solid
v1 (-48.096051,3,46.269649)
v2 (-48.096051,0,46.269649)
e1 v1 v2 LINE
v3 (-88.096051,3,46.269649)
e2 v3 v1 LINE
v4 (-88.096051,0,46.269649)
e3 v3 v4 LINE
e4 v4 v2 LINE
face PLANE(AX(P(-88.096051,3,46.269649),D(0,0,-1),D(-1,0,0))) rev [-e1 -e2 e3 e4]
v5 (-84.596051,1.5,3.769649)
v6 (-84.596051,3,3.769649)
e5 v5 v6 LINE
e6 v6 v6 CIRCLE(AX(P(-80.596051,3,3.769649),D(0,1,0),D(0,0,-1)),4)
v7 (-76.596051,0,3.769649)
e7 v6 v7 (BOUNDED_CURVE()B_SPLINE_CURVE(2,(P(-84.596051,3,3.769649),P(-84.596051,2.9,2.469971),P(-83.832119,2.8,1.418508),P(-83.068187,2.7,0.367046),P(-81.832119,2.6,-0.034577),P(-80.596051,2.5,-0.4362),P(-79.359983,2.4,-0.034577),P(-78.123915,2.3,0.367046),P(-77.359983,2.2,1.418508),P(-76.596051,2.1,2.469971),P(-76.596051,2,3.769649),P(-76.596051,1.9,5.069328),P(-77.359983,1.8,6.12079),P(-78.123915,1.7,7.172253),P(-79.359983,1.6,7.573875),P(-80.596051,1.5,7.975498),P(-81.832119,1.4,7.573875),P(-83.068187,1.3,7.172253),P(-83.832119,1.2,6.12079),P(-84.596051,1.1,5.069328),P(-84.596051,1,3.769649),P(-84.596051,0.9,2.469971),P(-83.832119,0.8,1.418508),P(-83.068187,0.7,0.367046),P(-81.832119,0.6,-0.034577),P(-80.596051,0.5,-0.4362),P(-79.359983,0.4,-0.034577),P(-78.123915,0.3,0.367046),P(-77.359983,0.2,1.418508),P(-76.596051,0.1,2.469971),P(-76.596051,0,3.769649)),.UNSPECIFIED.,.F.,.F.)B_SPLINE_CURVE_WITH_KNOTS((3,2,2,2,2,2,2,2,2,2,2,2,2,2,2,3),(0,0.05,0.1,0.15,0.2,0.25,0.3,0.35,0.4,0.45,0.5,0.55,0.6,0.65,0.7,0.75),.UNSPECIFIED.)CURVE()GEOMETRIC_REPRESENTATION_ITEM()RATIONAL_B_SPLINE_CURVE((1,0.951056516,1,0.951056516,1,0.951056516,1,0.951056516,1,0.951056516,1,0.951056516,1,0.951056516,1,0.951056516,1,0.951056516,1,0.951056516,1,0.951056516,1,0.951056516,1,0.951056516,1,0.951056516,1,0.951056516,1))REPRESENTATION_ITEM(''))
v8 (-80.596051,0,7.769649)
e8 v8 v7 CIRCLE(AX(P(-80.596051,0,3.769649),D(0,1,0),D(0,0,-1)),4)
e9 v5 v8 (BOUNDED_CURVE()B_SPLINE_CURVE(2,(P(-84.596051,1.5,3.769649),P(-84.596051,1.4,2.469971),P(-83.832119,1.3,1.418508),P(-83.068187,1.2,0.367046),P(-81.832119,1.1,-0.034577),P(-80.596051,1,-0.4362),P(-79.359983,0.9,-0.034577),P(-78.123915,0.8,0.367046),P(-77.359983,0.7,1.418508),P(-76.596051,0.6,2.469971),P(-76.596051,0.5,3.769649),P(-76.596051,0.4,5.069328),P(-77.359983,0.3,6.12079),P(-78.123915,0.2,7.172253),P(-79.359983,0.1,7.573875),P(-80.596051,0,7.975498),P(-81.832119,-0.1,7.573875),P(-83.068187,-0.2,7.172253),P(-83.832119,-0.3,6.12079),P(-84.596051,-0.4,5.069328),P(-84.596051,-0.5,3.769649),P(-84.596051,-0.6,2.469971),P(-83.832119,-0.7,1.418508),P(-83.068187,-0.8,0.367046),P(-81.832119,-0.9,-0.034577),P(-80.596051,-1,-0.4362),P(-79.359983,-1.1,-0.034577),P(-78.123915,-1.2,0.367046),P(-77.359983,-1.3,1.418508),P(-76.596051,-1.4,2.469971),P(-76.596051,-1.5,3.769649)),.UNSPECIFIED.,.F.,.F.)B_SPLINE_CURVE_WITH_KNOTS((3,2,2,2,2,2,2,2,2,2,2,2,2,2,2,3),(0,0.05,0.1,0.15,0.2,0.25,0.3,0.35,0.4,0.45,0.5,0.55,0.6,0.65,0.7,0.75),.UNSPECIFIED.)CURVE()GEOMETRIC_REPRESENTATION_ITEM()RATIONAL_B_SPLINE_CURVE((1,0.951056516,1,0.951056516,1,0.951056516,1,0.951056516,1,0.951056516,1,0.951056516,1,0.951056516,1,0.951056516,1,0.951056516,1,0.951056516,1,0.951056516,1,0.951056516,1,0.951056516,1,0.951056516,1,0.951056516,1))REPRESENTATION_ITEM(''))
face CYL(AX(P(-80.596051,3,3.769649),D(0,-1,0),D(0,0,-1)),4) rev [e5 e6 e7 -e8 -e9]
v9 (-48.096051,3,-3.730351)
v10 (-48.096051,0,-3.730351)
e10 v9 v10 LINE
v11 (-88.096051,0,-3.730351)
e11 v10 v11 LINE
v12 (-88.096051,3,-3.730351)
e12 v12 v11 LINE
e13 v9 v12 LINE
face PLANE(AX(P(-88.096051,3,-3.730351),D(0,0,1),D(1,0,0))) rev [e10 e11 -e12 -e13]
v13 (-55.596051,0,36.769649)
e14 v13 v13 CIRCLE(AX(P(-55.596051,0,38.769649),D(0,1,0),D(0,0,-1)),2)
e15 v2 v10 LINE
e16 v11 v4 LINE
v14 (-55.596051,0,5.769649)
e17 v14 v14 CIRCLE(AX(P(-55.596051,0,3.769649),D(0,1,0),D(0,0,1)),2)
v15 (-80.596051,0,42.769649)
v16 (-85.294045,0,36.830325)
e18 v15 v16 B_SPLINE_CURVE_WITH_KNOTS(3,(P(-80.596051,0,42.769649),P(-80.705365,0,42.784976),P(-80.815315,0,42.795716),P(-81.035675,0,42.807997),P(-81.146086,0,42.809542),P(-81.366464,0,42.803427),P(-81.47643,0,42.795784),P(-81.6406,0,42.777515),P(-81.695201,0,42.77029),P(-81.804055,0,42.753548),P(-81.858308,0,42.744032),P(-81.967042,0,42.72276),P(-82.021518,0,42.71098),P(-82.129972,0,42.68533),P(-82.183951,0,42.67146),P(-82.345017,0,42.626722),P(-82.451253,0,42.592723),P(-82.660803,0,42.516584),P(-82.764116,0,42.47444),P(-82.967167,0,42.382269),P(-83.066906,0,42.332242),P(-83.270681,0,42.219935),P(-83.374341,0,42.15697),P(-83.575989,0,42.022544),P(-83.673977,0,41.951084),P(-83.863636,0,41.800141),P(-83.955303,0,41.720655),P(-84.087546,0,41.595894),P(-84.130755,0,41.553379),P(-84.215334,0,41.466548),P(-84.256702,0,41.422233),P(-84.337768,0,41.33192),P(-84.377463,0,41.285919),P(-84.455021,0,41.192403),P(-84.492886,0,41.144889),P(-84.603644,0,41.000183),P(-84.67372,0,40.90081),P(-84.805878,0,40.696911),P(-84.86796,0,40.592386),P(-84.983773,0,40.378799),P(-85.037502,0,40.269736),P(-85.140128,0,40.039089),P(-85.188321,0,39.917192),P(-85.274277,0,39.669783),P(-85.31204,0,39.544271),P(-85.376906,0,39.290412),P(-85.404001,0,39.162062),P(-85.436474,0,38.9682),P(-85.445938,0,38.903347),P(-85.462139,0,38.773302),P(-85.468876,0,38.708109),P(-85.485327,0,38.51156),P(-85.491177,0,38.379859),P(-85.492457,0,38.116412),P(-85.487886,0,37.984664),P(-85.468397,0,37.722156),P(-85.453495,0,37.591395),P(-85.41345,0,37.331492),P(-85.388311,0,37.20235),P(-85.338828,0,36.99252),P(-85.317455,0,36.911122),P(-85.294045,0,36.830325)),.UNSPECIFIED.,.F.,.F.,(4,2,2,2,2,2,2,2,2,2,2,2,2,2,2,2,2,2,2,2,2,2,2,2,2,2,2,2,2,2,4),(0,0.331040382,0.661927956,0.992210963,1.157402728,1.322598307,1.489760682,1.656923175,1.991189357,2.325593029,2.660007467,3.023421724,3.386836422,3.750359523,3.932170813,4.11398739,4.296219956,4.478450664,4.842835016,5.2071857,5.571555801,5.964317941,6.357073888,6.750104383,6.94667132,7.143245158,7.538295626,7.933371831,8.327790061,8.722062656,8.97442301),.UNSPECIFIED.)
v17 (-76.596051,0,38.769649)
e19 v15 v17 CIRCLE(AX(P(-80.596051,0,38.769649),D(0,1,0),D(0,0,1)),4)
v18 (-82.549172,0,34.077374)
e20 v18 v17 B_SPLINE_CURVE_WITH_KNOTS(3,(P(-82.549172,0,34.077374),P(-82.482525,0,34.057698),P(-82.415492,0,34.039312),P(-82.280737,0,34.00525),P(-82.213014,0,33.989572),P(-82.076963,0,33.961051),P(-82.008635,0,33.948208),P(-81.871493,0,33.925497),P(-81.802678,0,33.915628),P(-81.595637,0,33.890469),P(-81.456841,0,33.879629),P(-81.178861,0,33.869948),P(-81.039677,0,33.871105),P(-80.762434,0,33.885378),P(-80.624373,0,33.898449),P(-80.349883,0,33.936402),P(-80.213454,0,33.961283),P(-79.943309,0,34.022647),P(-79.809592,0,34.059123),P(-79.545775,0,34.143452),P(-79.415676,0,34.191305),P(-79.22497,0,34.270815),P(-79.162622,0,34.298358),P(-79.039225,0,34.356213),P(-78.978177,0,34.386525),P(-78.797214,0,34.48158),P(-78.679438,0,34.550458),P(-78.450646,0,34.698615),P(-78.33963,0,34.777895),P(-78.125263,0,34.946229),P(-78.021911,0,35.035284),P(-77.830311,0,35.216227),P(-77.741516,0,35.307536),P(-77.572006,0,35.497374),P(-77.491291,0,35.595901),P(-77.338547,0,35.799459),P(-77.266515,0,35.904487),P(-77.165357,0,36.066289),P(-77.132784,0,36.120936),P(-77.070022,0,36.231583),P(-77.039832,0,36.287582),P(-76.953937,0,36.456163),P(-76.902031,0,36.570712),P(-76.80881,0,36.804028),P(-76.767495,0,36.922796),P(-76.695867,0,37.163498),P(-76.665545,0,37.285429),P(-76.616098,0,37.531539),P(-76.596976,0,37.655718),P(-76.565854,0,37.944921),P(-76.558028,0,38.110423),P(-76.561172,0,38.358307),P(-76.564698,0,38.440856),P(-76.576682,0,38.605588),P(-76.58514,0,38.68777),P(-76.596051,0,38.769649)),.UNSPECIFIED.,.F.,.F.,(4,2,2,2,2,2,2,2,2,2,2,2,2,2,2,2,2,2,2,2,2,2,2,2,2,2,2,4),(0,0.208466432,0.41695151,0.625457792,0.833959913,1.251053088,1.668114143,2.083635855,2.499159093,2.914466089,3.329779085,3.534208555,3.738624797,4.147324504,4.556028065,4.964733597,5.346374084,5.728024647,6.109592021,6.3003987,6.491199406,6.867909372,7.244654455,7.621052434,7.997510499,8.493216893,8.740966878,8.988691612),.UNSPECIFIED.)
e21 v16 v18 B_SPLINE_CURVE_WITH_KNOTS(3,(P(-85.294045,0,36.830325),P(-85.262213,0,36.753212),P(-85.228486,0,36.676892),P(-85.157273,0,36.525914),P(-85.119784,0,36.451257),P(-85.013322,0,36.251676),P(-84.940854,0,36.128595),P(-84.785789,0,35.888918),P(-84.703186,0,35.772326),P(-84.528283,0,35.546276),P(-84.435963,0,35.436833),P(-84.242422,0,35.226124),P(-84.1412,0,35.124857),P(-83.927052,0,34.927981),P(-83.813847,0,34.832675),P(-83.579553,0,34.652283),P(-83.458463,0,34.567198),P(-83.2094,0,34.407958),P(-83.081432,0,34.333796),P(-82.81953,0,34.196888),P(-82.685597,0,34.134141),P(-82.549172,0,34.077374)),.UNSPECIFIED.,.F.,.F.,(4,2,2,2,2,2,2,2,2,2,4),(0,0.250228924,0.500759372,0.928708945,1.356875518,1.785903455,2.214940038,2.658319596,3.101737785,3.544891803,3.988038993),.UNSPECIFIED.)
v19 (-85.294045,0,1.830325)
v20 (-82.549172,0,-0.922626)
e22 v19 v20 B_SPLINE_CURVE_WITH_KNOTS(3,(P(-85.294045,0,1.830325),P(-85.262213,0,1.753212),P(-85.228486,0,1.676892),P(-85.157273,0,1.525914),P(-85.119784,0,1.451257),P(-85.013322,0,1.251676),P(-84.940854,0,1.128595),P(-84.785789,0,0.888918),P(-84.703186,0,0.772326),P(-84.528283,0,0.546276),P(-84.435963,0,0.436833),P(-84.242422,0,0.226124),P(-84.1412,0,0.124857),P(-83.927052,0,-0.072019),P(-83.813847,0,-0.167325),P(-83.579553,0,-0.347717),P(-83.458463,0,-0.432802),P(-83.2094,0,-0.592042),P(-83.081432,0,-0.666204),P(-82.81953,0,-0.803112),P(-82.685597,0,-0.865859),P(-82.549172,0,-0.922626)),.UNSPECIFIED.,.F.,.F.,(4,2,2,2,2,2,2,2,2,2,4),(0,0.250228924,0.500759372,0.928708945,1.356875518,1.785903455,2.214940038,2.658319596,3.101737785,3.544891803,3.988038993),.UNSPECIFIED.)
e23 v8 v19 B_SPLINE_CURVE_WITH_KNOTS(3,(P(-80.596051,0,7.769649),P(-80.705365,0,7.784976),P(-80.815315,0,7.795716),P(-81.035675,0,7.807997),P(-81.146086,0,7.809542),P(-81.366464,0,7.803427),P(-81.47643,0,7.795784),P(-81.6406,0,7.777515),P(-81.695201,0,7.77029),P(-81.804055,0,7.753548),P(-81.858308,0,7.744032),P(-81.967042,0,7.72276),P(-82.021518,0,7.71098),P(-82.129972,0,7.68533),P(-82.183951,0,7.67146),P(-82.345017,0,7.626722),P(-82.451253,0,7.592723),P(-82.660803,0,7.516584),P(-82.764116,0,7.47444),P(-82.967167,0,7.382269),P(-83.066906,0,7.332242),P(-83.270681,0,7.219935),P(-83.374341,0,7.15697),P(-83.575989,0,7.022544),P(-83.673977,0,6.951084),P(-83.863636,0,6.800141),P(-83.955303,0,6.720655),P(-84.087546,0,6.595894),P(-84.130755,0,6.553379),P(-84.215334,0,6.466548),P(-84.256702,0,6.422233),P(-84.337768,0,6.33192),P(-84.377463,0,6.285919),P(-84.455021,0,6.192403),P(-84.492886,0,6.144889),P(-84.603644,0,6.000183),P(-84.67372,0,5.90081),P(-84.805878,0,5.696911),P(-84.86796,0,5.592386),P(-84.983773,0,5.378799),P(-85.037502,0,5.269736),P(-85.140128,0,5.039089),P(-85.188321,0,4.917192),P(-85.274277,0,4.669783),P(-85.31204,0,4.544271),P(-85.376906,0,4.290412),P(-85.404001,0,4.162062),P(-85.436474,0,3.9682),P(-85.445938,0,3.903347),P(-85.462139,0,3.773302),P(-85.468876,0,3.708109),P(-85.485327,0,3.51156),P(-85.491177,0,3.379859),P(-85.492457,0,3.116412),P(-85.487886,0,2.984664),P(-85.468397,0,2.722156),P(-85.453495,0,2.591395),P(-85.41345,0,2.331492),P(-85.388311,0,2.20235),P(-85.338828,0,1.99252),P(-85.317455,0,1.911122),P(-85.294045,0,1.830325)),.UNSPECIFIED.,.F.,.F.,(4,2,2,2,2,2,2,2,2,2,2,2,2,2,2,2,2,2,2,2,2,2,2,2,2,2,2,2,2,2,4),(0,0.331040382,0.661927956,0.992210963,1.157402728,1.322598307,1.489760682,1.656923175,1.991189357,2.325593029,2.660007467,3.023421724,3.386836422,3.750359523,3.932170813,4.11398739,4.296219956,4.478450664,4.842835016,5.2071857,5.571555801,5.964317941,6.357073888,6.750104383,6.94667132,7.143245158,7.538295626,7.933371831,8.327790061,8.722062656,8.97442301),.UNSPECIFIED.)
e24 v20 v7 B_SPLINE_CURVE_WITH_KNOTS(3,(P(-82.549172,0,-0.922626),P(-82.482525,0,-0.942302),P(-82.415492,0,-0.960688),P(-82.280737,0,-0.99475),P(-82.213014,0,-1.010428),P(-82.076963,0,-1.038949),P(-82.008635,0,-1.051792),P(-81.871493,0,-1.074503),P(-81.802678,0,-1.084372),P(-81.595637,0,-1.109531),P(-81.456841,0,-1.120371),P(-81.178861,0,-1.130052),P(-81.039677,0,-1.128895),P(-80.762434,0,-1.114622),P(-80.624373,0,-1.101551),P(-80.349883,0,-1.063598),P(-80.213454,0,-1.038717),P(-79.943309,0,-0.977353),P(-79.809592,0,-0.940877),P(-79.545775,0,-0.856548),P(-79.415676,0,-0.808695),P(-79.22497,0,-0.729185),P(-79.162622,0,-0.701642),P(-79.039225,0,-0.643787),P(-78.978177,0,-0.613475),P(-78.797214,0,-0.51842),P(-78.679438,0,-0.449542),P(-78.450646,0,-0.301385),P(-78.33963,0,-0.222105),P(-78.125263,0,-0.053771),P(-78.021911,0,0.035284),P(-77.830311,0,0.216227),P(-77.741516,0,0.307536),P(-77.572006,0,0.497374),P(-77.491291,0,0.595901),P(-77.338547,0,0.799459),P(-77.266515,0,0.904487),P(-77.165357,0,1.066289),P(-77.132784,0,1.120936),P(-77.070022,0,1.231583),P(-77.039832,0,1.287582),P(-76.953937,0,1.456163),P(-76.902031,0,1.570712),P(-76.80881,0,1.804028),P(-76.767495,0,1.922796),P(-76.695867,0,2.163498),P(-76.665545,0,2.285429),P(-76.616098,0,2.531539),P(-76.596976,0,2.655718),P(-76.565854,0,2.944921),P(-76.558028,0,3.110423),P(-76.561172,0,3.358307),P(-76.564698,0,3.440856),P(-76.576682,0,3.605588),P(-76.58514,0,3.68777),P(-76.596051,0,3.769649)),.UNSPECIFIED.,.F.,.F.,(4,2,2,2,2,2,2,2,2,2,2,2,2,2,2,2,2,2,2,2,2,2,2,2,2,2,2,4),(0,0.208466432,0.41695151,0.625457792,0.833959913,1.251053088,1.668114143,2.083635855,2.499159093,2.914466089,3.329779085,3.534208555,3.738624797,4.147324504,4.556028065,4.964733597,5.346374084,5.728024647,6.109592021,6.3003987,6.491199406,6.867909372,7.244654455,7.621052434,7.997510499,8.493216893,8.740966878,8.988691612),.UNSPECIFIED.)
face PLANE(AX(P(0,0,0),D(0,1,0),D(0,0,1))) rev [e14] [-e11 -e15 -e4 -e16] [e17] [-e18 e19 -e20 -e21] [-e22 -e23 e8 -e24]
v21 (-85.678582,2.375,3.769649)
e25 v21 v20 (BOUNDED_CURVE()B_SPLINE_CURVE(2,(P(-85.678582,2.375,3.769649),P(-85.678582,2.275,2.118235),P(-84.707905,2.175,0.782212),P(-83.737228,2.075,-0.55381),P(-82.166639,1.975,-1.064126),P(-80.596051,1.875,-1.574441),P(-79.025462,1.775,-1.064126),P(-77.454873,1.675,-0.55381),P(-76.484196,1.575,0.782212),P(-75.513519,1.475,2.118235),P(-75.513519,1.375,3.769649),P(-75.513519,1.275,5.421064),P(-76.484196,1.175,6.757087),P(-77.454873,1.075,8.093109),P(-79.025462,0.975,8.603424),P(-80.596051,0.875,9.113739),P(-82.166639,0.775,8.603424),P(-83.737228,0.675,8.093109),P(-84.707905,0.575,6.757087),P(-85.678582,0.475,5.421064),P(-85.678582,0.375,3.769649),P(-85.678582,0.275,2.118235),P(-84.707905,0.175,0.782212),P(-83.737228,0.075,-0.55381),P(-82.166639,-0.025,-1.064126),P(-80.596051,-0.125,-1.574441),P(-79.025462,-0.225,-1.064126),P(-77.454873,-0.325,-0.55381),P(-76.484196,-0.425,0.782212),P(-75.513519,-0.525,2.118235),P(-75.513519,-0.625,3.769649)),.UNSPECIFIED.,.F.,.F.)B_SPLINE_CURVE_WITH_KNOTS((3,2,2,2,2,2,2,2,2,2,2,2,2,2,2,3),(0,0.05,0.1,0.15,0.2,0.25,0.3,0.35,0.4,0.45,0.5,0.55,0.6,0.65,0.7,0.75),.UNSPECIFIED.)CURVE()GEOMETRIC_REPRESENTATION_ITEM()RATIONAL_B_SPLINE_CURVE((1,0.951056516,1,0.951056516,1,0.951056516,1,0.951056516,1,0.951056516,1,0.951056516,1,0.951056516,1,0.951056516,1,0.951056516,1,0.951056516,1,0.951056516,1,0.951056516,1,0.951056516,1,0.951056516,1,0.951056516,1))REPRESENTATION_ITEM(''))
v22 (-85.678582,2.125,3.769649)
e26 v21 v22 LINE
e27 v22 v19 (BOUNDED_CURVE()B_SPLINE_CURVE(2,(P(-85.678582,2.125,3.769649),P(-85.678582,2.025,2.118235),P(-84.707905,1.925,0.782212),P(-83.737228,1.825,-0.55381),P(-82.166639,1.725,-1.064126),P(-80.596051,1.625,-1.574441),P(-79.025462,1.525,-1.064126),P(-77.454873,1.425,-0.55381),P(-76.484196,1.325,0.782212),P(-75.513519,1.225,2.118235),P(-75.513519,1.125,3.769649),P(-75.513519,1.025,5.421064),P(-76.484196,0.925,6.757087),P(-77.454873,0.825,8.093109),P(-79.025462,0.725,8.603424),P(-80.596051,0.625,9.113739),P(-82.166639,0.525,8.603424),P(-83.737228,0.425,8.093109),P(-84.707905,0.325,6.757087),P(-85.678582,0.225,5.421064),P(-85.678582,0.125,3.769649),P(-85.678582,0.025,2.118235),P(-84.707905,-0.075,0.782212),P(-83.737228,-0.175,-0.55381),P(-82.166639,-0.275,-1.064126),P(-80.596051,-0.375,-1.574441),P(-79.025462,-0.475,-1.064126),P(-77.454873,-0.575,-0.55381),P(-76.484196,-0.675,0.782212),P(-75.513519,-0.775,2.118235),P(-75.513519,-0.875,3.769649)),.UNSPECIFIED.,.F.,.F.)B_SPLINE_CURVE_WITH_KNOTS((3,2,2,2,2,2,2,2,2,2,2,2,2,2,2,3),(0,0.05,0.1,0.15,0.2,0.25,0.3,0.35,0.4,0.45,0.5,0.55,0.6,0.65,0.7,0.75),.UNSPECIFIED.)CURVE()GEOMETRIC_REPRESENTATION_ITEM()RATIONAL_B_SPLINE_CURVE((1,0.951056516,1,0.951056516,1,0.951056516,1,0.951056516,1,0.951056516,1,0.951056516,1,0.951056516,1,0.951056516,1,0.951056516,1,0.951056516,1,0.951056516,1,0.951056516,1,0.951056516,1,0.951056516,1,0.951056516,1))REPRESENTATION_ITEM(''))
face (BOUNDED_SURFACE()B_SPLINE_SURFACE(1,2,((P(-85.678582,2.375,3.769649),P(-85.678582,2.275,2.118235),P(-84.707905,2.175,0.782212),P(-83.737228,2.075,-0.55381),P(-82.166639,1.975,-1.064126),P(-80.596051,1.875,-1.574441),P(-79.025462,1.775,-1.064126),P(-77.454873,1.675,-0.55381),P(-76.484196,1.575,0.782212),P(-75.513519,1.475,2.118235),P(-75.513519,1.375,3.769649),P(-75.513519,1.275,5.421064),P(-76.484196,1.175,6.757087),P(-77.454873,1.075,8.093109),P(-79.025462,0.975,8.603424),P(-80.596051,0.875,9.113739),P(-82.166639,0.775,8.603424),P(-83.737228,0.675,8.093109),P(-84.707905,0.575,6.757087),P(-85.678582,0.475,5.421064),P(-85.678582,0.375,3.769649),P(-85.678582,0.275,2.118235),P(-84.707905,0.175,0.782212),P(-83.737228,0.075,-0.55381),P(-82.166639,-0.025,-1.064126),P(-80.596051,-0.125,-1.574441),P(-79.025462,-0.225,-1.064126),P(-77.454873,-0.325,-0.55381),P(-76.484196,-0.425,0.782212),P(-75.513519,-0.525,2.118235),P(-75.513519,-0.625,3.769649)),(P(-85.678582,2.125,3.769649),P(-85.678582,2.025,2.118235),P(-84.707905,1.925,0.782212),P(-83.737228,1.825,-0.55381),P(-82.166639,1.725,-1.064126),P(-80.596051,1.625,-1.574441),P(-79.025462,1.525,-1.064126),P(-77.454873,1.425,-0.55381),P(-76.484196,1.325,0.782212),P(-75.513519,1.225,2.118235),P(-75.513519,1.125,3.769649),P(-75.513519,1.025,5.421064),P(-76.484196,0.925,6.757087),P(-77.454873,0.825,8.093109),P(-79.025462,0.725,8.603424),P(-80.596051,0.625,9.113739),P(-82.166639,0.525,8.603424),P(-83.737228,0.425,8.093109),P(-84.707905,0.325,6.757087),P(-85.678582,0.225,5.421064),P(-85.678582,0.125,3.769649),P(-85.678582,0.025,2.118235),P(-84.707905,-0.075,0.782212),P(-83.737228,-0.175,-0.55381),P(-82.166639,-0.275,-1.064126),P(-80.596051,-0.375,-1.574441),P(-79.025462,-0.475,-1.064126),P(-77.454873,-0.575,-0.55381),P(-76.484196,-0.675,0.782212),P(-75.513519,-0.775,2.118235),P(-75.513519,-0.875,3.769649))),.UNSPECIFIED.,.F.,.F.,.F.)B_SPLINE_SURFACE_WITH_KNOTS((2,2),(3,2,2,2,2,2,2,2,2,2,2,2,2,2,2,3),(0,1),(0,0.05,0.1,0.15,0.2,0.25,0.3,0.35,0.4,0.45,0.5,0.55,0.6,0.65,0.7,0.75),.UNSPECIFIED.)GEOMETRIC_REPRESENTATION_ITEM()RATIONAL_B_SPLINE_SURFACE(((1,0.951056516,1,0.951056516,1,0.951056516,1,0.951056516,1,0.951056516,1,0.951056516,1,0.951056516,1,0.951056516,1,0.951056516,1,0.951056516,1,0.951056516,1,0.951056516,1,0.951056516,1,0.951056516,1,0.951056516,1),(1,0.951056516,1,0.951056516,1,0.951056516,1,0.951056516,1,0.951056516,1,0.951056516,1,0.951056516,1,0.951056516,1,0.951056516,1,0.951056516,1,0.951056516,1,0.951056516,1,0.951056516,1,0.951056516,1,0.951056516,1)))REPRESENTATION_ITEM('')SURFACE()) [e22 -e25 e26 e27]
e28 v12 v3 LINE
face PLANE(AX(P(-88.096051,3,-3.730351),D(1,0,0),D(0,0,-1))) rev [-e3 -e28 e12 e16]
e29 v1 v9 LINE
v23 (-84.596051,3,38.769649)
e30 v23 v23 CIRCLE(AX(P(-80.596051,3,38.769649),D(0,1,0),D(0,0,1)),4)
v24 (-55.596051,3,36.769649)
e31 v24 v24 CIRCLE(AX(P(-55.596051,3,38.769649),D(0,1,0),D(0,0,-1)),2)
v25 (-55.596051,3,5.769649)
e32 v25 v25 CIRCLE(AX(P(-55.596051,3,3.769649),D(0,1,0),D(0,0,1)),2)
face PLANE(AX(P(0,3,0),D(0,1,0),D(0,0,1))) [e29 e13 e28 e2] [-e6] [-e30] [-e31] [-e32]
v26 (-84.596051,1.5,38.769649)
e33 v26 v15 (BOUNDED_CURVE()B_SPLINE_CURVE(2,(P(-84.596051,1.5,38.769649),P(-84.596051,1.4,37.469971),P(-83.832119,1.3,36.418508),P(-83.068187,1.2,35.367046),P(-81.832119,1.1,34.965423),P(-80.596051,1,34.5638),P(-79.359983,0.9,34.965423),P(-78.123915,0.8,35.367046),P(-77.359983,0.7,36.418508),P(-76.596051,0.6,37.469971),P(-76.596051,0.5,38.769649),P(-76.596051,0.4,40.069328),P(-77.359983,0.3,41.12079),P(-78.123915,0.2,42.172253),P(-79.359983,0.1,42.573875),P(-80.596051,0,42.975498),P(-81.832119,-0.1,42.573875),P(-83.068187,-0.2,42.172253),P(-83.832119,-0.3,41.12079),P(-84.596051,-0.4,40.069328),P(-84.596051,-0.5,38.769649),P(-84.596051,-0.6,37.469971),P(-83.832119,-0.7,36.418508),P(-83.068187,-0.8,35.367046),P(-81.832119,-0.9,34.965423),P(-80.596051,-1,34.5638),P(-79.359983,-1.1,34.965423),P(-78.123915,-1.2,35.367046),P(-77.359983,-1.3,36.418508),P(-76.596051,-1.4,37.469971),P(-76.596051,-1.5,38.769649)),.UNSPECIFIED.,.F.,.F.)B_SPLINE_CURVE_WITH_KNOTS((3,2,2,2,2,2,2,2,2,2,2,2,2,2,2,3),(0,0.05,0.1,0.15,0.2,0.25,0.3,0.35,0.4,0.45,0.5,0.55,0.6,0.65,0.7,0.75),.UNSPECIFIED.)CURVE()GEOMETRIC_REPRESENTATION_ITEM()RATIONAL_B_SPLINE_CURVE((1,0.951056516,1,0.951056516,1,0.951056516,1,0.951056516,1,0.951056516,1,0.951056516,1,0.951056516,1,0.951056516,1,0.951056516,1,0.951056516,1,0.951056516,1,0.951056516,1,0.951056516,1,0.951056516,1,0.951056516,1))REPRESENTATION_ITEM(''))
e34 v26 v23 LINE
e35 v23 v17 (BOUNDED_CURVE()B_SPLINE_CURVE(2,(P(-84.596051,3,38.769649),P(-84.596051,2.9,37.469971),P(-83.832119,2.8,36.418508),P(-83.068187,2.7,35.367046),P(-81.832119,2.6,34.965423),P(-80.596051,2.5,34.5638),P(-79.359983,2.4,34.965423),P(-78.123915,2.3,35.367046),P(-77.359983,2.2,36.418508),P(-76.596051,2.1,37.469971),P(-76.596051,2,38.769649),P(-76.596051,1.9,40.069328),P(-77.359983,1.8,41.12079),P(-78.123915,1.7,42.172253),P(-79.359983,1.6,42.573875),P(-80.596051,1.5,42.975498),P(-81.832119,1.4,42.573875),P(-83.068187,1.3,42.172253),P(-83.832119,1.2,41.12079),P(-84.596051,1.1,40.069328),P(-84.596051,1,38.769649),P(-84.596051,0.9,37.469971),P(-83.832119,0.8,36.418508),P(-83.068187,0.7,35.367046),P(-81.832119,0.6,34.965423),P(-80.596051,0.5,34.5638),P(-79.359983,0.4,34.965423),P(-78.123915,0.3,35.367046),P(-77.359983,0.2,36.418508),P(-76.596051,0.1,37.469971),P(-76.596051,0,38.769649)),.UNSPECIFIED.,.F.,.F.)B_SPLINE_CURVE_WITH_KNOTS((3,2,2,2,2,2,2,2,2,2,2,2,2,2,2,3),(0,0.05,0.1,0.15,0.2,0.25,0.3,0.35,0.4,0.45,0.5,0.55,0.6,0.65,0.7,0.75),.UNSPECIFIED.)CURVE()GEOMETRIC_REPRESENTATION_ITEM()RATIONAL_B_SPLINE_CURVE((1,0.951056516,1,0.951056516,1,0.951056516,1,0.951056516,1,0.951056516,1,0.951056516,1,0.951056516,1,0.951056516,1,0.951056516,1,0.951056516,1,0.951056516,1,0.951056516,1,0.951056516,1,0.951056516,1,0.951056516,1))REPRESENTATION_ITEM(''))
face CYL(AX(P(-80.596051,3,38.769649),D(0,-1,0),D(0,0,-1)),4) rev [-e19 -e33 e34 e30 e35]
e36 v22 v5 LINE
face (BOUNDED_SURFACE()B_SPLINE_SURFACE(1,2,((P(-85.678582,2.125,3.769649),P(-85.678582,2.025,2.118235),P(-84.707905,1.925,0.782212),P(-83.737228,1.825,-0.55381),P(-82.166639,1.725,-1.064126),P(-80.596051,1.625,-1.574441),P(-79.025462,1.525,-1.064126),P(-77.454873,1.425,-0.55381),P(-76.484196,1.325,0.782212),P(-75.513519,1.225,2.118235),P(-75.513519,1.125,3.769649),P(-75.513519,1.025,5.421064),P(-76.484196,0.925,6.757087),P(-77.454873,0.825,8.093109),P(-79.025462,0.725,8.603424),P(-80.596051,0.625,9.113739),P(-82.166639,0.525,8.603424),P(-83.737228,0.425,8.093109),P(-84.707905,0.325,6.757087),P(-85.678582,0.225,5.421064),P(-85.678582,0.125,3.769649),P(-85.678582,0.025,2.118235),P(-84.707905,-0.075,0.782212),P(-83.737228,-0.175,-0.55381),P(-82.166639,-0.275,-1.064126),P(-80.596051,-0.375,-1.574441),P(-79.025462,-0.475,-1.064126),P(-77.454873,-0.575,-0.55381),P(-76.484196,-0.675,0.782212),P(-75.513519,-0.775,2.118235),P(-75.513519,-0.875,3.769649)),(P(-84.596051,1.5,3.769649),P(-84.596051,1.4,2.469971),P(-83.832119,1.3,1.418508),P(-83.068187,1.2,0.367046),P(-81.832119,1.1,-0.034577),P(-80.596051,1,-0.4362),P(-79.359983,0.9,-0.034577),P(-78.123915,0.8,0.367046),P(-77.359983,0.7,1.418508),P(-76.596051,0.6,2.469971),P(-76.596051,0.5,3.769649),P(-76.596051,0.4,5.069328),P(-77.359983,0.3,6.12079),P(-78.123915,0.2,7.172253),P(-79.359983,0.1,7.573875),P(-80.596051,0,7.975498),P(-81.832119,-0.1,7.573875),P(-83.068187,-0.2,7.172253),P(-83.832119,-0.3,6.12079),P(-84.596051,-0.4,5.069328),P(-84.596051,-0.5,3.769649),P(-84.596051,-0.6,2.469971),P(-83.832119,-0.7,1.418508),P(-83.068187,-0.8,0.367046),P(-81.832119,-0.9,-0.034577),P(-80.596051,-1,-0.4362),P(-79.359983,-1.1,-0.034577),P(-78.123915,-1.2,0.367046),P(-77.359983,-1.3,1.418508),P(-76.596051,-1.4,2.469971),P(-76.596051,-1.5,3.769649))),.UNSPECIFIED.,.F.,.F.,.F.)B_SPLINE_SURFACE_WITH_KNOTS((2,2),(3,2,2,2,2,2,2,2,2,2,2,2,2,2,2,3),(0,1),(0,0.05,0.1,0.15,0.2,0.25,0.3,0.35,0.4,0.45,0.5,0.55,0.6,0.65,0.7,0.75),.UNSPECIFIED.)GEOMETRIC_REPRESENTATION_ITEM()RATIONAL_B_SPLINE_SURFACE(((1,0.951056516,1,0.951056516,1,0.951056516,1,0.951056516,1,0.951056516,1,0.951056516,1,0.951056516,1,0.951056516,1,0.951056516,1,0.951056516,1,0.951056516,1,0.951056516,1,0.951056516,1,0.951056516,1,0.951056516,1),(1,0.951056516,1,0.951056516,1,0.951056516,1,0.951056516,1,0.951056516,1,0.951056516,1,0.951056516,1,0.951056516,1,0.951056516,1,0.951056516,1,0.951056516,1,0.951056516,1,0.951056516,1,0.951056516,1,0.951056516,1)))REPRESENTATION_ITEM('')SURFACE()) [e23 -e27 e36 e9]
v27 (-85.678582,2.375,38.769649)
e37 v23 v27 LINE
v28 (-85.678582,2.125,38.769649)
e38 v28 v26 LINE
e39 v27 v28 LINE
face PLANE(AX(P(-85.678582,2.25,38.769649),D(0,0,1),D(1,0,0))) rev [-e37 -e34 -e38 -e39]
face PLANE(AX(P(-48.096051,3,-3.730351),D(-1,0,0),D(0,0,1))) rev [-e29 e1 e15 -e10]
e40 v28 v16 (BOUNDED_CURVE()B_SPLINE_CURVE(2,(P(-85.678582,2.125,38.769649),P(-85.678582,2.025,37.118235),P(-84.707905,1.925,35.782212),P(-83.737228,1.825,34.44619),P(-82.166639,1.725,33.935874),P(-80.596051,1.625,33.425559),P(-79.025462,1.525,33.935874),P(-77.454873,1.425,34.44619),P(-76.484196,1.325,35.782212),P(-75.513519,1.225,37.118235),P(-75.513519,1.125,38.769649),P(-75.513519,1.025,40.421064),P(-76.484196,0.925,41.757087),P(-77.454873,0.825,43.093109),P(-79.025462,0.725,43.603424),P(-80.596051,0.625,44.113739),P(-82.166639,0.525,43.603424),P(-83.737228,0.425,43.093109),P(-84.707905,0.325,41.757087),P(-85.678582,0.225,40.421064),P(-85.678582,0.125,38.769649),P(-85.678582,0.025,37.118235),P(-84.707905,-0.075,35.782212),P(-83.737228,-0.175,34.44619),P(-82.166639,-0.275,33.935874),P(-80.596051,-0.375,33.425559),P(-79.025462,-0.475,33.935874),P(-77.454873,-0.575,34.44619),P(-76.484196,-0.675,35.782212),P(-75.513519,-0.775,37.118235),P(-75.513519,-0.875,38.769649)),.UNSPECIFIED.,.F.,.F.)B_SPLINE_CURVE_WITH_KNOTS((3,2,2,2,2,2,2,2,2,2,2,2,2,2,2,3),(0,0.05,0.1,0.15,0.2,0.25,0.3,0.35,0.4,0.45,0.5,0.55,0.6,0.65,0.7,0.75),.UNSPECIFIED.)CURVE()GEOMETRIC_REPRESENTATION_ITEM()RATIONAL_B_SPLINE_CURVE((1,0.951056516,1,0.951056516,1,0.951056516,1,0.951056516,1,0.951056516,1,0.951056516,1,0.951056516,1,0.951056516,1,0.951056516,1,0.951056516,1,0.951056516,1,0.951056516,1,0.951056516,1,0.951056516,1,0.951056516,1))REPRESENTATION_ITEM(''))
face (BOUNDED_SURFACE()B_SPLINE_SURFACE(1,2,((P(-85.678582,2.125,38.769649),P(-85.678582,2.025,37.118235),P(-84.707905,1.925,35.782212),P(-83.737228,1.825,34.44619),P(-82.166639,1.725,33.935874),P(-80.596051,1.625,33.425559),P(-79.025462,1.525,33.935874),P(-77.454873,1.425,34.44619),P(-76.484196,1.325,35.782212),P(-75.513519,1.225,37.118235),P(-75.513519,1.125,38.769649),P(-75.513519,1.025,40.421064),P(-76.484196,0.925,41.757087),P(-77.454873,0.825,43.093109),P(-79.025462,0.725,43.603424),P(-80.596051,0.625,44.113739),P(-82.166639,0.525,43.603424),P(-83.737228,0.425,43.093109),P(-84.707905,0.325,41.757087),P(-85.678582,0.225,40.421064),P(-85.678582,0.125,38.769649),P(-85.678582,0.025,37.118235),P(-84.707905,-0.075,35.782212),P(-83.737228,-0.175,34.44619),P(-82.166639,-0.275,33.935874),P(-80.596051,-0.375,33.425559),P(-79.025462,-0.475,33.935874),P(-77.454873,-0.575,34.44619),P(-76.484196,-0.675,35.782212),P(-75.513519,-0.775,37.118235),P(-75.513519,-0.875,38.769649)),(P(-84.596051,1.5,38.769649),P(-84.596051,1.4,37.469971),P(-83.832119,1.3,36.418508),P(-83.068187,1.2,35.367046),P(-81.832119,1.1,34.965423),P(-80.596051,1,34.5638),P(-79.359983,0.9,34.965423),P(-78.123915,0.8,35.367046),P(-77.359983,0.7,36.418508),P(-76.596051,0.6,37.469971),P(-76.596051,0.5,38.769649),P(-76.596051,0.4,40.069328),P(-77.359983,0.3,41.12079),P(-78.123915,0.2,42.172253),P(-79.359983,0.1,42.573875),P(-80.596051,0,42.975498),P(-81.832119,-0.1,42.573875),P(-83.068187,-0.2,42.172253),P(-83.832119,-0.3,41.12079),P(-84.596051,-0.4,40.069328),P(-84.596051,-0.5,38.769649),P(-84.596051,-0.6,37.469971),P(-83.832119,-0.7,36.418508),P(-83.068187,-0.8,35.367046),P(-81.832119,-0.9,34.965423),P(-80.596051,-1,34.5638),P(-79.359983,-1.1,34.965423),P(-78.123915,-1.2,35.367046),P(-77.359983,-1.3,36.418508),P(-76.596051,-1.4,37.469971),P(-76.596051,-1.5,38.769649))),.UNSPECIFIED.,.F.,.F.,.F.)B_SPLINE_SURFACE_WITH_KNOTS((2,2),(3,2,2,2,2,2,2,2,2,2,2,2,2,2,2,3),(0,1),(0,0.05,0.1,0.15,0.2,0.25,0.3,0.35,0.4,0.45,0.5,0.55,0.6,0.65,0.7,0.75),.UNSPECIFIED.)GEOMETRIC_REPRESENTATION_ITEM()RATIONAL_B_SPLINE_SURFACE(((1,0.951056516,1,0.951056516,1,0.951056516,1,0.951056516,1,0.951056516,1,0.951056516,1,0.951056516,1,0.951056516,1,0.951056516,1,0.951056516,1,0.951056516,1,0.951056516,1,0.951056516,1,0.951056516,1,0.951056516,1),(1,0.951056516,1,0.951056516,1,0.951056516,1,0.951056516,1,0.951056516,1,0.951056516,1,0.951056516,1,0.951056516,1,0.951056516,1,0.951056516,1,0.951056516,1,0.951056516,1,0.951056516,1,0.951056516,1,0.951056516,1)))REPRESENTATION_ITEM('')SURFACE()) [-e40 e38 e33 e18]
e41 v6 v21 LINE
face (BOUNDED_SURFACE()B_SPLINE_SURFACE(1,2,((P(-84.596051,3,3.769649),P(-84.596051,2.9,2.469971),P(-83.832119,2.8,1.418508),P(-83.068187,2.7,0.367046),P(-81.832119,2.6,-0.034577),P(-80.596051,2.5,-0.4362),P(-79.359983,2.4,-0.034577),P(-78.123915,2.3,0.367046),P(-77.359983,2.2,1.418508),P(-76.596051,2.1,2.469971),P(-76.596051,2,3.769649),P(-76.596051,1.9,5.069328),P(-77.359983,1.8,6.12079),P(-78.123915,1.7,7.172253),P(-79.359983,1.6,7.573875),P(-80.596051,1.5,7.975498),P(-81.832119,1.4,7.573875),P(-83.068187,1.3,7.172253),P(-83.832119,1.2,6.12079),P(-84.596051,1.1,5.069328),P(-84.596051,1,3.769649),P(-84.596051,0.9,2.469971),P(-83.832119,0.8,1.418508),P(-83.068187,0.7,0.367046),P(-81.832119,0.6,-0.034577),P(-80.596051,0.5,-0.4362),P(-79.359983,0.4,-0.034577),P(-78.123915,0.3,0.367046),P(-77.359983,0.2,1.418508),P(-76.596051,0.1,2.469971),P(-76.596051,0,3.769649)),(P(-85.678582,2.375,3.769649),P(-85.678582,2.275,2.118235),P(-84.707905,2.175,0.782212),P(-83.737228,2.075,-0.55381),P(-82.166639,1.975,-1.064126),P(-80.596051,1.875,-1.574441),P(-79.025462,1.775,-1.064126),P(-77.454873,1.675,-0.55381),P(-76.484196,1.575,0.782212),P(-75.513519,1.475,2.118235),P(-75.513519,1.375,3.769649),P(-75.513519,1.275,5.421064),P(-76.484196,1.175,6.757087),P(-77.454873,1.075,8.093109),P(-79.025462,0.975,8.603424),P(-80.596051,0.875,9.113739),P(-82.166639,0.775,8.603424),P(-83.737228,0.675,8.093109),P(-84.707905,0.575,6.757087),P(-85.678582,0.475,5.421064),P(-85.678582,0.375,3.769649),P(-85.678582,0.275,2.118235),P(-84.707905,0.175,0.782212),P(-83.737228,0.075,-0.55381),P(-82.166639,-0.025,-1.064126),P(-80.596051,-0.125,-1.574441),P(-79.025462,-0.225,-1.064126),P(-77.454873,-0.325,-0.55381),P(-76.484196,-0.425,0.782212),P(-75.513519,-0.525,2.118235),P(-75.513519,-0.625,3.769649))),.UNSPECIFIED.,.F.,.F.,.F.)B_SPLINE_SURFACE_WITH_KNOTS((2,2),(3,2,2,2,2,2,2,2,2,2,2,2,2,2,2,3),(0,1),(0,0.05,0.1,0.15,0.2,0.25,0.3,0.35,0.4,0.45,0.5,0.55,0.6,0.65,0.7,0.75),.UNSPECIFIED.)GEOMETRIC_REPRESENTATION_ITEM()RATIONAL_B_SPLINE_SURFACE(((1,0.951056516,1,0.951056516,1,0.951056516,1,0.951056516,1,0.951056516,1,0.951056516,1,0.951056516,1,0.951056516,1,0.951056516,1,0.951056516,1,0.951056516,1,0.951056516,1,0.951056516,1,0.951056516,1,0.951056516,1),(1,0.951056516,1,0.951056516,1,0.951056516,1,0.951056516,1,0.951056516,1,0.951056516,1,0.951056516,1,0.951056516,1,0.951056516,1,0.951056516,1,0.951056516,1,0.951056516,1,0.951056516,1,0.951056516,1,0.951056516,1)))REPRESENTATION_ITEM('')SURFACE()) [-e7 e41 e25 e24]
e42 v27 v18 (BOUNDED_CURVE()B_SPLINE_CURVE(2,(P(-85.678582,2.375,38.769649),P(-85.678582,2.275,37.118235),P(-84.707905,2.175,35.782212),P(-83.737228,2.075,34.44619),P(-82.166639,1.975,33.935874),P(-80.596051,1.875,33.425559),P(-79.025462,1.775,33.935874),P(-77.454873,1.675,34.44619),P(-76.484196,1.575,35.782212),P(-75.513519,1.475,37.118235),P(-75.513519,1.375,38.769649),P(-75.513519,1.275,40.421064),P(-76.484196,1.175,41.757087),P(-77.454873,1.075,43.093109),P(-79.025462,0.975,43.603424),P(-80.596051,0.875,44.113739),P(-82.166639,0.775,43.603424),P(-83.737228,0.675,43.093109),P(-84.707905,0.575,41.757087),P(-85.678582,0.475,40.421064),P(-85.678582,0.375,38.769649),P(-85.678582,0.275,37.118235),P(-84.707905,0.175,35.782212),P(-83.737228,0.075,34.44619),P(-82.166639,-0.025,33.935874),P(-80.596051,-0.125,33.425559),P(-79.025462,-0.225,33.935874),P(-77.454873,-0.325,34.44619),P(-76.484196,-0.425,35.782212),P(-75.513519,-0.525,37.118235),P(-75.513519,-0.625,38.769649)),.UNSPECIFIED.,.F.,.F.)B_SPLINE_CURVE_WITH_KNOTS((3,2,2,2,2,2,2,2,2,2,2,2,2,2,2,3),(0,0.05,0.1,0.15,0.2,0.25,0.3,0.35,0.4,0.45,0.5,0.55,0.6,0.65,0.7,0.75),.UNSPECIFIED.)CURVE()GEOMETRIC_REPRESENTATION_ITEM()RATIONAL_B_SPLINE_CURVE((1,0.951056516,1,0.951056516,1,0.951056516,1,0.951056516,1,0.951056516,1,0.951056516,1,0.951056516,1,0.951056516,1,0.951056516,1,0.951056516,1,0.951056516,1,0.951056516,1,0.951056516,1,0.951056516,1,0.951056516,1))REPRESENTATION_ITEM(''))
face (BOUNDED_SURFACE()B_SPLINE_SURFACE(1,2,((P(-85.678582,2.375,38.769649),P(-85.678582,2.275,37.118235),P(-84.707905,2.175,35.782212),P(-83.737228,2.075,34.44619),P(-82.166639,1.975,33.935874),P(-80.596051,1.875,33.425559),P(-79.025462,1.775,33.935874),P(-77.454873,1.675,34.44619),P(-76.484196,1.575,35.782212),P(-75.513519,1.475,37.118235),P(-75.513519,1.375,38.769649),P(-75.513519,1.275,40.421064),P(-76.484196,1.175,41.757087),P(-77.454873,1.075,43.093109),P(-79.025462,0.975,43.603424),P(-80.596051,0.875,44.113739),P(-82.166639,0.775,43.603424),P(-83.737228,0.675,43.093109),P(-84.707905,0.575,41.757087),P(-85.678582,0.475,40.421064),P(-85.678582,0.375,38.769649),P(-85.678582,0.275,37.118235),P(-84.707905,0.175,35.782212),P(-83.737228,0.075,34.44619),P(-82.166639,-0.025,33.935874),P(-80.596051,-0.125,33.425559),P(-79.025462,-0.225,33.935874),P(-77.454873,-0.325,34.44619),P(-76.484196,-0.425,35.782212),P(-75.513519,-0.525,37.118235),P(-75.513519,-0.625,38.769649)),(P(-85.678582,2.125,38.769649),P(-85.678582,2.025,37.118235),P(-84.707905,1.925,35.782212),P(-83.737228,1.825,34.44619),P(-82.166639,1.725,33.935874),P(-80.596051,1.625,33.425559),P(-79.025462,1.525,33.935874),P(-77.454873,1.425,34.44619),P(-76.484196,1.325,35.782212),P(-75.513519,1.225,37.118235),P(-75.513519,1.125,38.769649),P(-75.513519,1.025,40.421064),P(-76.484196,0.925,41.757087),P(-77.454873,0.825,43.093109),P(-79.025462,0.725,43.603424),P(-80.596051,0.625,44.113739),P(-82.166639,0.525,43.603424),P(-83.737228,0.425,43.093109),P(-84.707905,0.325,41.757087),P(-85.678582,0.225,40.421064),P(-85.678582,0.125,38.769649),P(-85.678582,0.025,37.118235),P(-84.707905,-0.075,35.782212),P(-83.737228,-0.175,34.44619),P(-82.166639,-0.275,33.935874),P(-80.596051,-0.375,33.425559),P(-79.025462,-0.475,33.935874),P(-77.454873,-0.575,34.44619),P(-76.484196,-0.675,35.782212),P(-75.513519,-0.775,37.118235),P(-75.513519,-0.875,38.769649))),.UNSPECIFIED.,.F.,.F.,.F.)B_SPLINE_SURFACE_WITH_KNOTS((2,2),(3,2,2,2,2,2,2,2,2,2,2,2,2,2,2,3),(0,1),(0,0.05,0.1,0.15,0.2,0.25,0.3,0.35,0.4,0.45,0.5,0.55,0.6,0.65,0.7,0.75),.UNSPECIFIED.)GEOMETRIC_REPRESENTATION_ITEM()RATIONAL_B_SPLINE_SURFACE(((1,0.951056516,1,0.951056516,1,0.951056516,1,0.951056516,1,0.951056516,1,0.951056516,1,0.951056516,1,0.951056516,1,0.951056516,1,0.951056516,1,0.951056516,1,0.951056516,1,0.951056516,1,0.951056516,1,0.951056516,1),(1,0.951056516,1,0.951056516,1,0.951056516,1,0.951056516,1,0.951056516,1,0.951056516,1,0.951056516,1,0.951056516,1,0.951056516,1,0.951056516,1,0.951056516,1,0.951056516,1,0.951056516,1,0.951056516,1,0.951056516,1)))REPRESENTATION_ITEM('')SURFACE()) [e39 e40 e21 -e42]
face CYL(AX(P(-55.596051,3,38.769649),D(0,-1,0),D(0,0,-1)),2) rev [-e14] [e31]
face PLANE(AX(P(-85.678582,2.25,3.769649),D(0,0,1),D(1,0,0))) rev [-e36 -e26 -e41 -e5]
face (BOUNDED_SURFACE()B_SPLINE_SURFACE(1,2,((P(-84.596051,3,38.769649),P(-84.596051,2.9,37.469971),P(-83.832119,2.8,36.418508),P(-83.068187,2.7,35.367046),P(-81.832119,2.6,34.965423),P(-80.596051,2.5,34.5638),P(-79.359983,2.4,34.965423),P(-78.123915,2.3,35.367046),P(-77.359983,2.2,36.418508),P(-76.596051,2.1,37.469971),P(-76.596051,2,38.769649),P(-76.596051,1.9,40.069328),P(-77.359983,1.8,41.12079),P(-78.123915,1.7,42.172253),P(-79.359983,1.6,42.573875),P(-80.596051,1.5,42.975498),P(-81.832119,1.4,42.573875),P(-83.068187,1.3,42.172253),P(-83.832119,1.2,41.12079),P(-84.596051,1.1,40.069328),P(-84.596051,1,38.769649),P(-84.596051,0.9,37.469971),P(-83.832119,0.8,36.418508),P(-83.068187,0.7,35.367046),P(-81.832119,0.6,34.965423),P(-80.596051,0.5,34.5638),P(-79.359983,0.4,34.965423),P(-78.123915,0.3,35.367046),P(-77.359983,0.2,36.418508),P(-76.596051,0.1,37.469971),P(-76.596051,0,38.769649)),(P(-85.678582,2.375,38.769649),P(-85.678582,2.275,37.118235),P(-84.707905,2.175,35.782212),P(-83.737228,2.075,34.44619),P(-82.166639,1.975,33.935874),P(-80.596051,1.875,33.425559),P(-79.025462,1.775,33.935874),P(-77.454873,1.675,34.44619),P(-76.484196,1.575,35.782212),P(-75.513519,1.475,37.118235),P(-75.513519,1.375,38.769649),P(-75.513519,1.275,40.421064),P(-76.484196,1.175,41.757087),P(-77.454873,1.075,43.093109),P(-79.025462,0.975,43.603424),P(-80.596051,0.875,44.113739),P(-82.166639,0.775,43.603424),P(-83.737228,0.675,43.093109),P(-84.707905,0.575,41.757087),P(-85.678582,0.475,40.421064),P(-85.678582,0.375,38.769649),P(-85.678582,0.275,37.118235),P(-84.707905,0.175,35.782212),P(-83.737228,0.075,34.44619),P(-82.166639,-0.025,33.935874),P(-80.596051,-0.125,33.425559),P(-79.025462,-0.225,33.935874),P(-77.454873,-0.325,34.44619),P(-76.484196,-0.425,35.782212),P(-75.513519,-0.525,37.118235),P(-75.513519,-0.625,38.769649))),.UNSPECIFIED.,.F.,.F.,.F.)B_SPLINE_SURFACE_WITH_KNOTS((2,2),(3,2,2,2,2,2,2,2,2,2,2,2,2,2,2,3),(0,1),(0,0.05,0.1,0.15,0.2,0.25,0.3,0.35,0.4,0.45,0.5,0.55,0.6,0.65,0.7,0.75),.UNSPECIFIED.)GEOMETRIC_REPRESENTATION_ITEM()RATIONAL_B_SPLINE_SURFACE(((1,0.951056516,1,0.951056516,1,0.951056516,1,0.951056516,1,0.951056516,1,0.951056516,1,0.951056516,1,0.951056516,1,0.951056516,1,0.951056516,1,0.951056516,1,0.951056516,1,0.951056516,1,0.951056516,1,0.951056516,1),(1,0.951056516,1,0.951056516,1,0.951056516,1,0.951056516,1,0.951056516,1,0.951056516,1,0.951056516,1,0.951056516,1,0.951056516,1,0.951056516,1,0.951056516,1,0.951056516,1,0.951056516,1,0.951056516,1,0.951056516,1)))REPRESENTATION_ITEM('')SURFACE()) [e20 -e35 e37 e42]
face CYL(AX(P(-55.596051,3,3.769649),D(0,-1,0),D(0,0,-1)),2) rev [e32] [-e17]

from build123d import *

# Parameters (mm, degrees)
SKETCH1_W           = 40
SKETCH1_H           = 50
SKETCH1_R           = 2
SKETCH1_R_2         = 4
BOSS_EXTRUDE1_DEPTH = 3
THREAD1_PITCH       = 2
THREAD2_PITCH       = 2


with BuildPart() as part:
    # Sketch1 → Boss-Extrude1 (new body)
    with BuildSketch(Plane(origin=(0, 0, 0), x_dir=(1, 0, 0), z_dir=(0, 1, 0))):
        with Locations((-68.096050638, -21.269649337)):
            Rectangle(SKETCH1_W, SKETCH1_H)
        with Locations(Location((-55.596050638, -3.769649337, 0), (0, 0, 270))):
            Circle(SKETCH1_R, mode=Mode.SUBTRACT)
        with Locations(Location((-55.596050638, -38.769649337, 0), (0, 0, 90))):
            Circle(SKETCH1_R, mode=Mode.SUBTRACT)
        with Locations(Location((-80.596050638, -38.769649337, 0), (0, 0, 270))):
            Circle(SKETCH1_R_2, mode=Mode.SUBTRACT)
        with Locations(Location((-80.596050638, -3.769649337, 0), (0, 0, 90))):
            Circle(SKETCH1_R_2, mode=Mode.SUBTRACT)
    extrude(amount=BOSS_EXTRUDE1_DEPTH)

    # Thread1: the profile of Thread Profile1 profile screwed along a right-hand helix of 1.5 turns, 10 arcs to a turn; built about Z, then put on its axis
    thread1_z = Axis((0, 0, 0), (0, 0, 1))
    thread1_corners = [(3.9997, 0, -0.000173205), (5.08253175, 0, 0.624999997), (5.08253175, 0, 0.874999997), (3.9997, 0, 1.5001732)]
    with BuildLine(mode=Mode.PRIVATE) as thread1_profile:
        Line(thread1_corners[0], thread1_corners[1])
        Line(thread1_corners[1], thread1_corners[2])
        Line(thread1_corners[2], thread1_corners[3])
        Line(thread1_corners[3], thread1_corners[0])
    thread1_cap = Face(thread1_profile.wire())
    thread1_turn_angles = [0, 18, 36, 54, 72, 90, 108, 126, 144, 162, 180, 198, 216, 234, 252, 270, 288, 306, 324, 342, 360]
    thread1_turn_weights = [1, 0.9510565162951535, 1, 0.9510565162951535, 1, 0.9510565162951535, 1, 0.9510565162951535, 1, 0.9510565162951535, 1, 0.9510565162951535, 1, 0.9510565162951535, 1, 0.9510565162951535, 1, 0.9510565162951535, 1, 0.9510565162951535, 1]
    thread1_turn_rails = [Edge.make_bspline([Vector(p[0], p[1], 0).rotate(thread1_z, thread1_turn_angles[k]) / thread1_turn_weights[k] + Vector(0, 0, p[2] + THREAD1_PITCH * thread1_turn_angles[k] / 360) for k in range(21)], [0, 0, 0, 1, 1, 2, 2, 3, 3, 4, 4, 5, 5, 6, 6, 7, 7, 8, 8, 9, 9, 10, 10, 10], 2, thread1_turn_weights) for p in thread1_corners]
    thread1_turn_sides = [Face.make_surface_from_curves(thread1_turn_rails[p[0]], thread1_turn_rails[p[1]]) for p in [(0, 1), (1, 2), (2, 3), (3, 0)]]
    thread1_last_angles = [360, 378, 396, 414, 432, 450, 468, 486, 504, 522, 540]
    thread1_last_weights = [1, 0.9510565162951535, 1, 0.9510565162951535, 1, 0.9510565162951535, 1, 0.9510565162951535, 1, 0.9510565162951535, 1]
    thread1_last_rails = [Edge.make_bspline([Vector(p[0], p[1], 0).rotate(thread1_z, thread1_last_angles[k]) / thread1_last_weights[k] + Vector(0, 0, p[2] + THREAD1_PITCH * thread1_last_angles[k] / 360) for k in range(11)], [0, 0, 0, 1, 1, 2, 2, 3, 3, 4, 4, 5, 5, 5], 2, thread1_last_weights) for p in thread1_corners]
    thread1_last_sides = [Face.make_surface_from_curves(thread1_last_rails[p[0]], thread1_last_rails[p[1]]) for p in [(0, 1), (1, 2), (2, 3), (3, 0)]]
    thread1 = Plane(origin=(-80.596050638, 3, 3.769649337), x_dir=(-1, 0, 0), z_dir=(0, -1, 0)) * Solid(Shell([*thread1_turn_sides, *thread1_last_sides, thread1_cap, thread1_cap.rotate(thread1_z, 540).moved(Location((0, 0, THREAD1_PITCH * 540 / 360)))]))
    add(thread1, mode=Mode.SUBTRACT)

    # Thread2: the profile of Thread Profile2 profile screwed along a right-hand helix of 1.5 turns, 10 arcs to a turn; built about Z, then put on its axis
    thread2_z = Axis((0, 0, 0), (0, 0, 1))
    thread2_corners = [(3.9997, 0, -0.000173205), (5.08253175, 0, 0.624999997), (5.08253175, 0, 0.874999997), (3.9997, 0, 1.5001732)]
    with BuildLine(mode=Mode.PRIVATE) as thread2_profile:
        Line(thread2_corners[0], thread2_corners[1])
        Line(thread2_corners[1], thread2_corners[2])
        Line(thread2_corners[2], thread2_corners[3])
        Line(thread2_corners[3], thread2_corners[0])
    thread2_cap = Face(thread2_profile.wire())
    thread2_turn_angles = [0, 18, 36, 54, 72, 90, 108, 126, 144, 162, 180, 198, 216, 234, 252, 270, 288, 306, 324, 342, 360]
    thread2_turn_weights = [1, 0.9510565162951535, 1, 0.9510565162951535, 1, 0.9510565162951535, 1, 0.9510565162951535, 1, 0.9510565162951535, 1, 0.9510565162951535, 1, 0.9510565162951535, 1, 0.9510565162951535, 1, 0.9510565162951535, 1, 0.9510565162951535, 1]
    thread2_turn_rails = [Edge.make_bspline([Vector(p[0], p[1], 0).rotate(thread2_z, thread2_turn_angles[k]) / thread2_turn_weights[k] + Vector(0, 0, p[2] + THREAD2_PITCH * thread2_turn_angles[k] / 360) for k in range(21)], [0, 0, 0, 1, 1, 2, 2, 3, 3, 4, 4, 5, 5, 6, 6, 7, 7, 8, 8, 9, 9, 10, 10, 10], 2, thread2_turn_weights) for p in thread2_corners]
    thread2_turn_sides = [Face.make_surface_from_curves(thread2_turn_rails[p[0]], thread2_turn_rails[p[1]]) for p in [(0, 1), (1, 2), (2, 3), (3, 0)]]
    thread2_last_angles = [360, 378, 396, 414, 432, 450, 468, 486, 504, 522, 540]
    thread2_last_weights = [1, 0.9510565162951535, 1, 0.9510565162951535, 1, 0.9510565162951535, 1, 0.9510565162951535, 1, 0.9510565162951535, 1]
    thread2_last_rails = [Edge.make_bspline([Vector(p[0], p[1], 0).rotate(thread2_z, thread2_last_angles[k]) / thread2_last_weights[k] + Vector(0, 0, p[2] + THREAD2_PITCH * thread2_last_angles[k] / 360) for k in range(11)], [0, 0, 0, 1, 1, 2, 2, 3, 3, 4, 4, 5, 5, 5], 2, thread2_last_weights) for p in thread2_corners]
    thread2_last_sides = [Face.make_surface_from_curves(thread2_last_rails[p[0]], thread2_last_rails[p[1]]) for p in [(0, 1), (1, 2), (2, 3), (3, 0)]]
    thread2 = Plane(origin=(-80.596050638, 3, 38.769649337), x_dir=(-1, 0, 0), z_dir=(0, -1, 0)) * Solid(Shell([*thread2_turn_sides, *thread2_last_sides, thread2_cap, thread2_cap.rotate(thread2_z, 540).moved(Location((0, 0, THREAD2_PITCH * 540 / 360)))]))
    add(thread2, mode=Mode.SUBTRACT)


solid = part.part
